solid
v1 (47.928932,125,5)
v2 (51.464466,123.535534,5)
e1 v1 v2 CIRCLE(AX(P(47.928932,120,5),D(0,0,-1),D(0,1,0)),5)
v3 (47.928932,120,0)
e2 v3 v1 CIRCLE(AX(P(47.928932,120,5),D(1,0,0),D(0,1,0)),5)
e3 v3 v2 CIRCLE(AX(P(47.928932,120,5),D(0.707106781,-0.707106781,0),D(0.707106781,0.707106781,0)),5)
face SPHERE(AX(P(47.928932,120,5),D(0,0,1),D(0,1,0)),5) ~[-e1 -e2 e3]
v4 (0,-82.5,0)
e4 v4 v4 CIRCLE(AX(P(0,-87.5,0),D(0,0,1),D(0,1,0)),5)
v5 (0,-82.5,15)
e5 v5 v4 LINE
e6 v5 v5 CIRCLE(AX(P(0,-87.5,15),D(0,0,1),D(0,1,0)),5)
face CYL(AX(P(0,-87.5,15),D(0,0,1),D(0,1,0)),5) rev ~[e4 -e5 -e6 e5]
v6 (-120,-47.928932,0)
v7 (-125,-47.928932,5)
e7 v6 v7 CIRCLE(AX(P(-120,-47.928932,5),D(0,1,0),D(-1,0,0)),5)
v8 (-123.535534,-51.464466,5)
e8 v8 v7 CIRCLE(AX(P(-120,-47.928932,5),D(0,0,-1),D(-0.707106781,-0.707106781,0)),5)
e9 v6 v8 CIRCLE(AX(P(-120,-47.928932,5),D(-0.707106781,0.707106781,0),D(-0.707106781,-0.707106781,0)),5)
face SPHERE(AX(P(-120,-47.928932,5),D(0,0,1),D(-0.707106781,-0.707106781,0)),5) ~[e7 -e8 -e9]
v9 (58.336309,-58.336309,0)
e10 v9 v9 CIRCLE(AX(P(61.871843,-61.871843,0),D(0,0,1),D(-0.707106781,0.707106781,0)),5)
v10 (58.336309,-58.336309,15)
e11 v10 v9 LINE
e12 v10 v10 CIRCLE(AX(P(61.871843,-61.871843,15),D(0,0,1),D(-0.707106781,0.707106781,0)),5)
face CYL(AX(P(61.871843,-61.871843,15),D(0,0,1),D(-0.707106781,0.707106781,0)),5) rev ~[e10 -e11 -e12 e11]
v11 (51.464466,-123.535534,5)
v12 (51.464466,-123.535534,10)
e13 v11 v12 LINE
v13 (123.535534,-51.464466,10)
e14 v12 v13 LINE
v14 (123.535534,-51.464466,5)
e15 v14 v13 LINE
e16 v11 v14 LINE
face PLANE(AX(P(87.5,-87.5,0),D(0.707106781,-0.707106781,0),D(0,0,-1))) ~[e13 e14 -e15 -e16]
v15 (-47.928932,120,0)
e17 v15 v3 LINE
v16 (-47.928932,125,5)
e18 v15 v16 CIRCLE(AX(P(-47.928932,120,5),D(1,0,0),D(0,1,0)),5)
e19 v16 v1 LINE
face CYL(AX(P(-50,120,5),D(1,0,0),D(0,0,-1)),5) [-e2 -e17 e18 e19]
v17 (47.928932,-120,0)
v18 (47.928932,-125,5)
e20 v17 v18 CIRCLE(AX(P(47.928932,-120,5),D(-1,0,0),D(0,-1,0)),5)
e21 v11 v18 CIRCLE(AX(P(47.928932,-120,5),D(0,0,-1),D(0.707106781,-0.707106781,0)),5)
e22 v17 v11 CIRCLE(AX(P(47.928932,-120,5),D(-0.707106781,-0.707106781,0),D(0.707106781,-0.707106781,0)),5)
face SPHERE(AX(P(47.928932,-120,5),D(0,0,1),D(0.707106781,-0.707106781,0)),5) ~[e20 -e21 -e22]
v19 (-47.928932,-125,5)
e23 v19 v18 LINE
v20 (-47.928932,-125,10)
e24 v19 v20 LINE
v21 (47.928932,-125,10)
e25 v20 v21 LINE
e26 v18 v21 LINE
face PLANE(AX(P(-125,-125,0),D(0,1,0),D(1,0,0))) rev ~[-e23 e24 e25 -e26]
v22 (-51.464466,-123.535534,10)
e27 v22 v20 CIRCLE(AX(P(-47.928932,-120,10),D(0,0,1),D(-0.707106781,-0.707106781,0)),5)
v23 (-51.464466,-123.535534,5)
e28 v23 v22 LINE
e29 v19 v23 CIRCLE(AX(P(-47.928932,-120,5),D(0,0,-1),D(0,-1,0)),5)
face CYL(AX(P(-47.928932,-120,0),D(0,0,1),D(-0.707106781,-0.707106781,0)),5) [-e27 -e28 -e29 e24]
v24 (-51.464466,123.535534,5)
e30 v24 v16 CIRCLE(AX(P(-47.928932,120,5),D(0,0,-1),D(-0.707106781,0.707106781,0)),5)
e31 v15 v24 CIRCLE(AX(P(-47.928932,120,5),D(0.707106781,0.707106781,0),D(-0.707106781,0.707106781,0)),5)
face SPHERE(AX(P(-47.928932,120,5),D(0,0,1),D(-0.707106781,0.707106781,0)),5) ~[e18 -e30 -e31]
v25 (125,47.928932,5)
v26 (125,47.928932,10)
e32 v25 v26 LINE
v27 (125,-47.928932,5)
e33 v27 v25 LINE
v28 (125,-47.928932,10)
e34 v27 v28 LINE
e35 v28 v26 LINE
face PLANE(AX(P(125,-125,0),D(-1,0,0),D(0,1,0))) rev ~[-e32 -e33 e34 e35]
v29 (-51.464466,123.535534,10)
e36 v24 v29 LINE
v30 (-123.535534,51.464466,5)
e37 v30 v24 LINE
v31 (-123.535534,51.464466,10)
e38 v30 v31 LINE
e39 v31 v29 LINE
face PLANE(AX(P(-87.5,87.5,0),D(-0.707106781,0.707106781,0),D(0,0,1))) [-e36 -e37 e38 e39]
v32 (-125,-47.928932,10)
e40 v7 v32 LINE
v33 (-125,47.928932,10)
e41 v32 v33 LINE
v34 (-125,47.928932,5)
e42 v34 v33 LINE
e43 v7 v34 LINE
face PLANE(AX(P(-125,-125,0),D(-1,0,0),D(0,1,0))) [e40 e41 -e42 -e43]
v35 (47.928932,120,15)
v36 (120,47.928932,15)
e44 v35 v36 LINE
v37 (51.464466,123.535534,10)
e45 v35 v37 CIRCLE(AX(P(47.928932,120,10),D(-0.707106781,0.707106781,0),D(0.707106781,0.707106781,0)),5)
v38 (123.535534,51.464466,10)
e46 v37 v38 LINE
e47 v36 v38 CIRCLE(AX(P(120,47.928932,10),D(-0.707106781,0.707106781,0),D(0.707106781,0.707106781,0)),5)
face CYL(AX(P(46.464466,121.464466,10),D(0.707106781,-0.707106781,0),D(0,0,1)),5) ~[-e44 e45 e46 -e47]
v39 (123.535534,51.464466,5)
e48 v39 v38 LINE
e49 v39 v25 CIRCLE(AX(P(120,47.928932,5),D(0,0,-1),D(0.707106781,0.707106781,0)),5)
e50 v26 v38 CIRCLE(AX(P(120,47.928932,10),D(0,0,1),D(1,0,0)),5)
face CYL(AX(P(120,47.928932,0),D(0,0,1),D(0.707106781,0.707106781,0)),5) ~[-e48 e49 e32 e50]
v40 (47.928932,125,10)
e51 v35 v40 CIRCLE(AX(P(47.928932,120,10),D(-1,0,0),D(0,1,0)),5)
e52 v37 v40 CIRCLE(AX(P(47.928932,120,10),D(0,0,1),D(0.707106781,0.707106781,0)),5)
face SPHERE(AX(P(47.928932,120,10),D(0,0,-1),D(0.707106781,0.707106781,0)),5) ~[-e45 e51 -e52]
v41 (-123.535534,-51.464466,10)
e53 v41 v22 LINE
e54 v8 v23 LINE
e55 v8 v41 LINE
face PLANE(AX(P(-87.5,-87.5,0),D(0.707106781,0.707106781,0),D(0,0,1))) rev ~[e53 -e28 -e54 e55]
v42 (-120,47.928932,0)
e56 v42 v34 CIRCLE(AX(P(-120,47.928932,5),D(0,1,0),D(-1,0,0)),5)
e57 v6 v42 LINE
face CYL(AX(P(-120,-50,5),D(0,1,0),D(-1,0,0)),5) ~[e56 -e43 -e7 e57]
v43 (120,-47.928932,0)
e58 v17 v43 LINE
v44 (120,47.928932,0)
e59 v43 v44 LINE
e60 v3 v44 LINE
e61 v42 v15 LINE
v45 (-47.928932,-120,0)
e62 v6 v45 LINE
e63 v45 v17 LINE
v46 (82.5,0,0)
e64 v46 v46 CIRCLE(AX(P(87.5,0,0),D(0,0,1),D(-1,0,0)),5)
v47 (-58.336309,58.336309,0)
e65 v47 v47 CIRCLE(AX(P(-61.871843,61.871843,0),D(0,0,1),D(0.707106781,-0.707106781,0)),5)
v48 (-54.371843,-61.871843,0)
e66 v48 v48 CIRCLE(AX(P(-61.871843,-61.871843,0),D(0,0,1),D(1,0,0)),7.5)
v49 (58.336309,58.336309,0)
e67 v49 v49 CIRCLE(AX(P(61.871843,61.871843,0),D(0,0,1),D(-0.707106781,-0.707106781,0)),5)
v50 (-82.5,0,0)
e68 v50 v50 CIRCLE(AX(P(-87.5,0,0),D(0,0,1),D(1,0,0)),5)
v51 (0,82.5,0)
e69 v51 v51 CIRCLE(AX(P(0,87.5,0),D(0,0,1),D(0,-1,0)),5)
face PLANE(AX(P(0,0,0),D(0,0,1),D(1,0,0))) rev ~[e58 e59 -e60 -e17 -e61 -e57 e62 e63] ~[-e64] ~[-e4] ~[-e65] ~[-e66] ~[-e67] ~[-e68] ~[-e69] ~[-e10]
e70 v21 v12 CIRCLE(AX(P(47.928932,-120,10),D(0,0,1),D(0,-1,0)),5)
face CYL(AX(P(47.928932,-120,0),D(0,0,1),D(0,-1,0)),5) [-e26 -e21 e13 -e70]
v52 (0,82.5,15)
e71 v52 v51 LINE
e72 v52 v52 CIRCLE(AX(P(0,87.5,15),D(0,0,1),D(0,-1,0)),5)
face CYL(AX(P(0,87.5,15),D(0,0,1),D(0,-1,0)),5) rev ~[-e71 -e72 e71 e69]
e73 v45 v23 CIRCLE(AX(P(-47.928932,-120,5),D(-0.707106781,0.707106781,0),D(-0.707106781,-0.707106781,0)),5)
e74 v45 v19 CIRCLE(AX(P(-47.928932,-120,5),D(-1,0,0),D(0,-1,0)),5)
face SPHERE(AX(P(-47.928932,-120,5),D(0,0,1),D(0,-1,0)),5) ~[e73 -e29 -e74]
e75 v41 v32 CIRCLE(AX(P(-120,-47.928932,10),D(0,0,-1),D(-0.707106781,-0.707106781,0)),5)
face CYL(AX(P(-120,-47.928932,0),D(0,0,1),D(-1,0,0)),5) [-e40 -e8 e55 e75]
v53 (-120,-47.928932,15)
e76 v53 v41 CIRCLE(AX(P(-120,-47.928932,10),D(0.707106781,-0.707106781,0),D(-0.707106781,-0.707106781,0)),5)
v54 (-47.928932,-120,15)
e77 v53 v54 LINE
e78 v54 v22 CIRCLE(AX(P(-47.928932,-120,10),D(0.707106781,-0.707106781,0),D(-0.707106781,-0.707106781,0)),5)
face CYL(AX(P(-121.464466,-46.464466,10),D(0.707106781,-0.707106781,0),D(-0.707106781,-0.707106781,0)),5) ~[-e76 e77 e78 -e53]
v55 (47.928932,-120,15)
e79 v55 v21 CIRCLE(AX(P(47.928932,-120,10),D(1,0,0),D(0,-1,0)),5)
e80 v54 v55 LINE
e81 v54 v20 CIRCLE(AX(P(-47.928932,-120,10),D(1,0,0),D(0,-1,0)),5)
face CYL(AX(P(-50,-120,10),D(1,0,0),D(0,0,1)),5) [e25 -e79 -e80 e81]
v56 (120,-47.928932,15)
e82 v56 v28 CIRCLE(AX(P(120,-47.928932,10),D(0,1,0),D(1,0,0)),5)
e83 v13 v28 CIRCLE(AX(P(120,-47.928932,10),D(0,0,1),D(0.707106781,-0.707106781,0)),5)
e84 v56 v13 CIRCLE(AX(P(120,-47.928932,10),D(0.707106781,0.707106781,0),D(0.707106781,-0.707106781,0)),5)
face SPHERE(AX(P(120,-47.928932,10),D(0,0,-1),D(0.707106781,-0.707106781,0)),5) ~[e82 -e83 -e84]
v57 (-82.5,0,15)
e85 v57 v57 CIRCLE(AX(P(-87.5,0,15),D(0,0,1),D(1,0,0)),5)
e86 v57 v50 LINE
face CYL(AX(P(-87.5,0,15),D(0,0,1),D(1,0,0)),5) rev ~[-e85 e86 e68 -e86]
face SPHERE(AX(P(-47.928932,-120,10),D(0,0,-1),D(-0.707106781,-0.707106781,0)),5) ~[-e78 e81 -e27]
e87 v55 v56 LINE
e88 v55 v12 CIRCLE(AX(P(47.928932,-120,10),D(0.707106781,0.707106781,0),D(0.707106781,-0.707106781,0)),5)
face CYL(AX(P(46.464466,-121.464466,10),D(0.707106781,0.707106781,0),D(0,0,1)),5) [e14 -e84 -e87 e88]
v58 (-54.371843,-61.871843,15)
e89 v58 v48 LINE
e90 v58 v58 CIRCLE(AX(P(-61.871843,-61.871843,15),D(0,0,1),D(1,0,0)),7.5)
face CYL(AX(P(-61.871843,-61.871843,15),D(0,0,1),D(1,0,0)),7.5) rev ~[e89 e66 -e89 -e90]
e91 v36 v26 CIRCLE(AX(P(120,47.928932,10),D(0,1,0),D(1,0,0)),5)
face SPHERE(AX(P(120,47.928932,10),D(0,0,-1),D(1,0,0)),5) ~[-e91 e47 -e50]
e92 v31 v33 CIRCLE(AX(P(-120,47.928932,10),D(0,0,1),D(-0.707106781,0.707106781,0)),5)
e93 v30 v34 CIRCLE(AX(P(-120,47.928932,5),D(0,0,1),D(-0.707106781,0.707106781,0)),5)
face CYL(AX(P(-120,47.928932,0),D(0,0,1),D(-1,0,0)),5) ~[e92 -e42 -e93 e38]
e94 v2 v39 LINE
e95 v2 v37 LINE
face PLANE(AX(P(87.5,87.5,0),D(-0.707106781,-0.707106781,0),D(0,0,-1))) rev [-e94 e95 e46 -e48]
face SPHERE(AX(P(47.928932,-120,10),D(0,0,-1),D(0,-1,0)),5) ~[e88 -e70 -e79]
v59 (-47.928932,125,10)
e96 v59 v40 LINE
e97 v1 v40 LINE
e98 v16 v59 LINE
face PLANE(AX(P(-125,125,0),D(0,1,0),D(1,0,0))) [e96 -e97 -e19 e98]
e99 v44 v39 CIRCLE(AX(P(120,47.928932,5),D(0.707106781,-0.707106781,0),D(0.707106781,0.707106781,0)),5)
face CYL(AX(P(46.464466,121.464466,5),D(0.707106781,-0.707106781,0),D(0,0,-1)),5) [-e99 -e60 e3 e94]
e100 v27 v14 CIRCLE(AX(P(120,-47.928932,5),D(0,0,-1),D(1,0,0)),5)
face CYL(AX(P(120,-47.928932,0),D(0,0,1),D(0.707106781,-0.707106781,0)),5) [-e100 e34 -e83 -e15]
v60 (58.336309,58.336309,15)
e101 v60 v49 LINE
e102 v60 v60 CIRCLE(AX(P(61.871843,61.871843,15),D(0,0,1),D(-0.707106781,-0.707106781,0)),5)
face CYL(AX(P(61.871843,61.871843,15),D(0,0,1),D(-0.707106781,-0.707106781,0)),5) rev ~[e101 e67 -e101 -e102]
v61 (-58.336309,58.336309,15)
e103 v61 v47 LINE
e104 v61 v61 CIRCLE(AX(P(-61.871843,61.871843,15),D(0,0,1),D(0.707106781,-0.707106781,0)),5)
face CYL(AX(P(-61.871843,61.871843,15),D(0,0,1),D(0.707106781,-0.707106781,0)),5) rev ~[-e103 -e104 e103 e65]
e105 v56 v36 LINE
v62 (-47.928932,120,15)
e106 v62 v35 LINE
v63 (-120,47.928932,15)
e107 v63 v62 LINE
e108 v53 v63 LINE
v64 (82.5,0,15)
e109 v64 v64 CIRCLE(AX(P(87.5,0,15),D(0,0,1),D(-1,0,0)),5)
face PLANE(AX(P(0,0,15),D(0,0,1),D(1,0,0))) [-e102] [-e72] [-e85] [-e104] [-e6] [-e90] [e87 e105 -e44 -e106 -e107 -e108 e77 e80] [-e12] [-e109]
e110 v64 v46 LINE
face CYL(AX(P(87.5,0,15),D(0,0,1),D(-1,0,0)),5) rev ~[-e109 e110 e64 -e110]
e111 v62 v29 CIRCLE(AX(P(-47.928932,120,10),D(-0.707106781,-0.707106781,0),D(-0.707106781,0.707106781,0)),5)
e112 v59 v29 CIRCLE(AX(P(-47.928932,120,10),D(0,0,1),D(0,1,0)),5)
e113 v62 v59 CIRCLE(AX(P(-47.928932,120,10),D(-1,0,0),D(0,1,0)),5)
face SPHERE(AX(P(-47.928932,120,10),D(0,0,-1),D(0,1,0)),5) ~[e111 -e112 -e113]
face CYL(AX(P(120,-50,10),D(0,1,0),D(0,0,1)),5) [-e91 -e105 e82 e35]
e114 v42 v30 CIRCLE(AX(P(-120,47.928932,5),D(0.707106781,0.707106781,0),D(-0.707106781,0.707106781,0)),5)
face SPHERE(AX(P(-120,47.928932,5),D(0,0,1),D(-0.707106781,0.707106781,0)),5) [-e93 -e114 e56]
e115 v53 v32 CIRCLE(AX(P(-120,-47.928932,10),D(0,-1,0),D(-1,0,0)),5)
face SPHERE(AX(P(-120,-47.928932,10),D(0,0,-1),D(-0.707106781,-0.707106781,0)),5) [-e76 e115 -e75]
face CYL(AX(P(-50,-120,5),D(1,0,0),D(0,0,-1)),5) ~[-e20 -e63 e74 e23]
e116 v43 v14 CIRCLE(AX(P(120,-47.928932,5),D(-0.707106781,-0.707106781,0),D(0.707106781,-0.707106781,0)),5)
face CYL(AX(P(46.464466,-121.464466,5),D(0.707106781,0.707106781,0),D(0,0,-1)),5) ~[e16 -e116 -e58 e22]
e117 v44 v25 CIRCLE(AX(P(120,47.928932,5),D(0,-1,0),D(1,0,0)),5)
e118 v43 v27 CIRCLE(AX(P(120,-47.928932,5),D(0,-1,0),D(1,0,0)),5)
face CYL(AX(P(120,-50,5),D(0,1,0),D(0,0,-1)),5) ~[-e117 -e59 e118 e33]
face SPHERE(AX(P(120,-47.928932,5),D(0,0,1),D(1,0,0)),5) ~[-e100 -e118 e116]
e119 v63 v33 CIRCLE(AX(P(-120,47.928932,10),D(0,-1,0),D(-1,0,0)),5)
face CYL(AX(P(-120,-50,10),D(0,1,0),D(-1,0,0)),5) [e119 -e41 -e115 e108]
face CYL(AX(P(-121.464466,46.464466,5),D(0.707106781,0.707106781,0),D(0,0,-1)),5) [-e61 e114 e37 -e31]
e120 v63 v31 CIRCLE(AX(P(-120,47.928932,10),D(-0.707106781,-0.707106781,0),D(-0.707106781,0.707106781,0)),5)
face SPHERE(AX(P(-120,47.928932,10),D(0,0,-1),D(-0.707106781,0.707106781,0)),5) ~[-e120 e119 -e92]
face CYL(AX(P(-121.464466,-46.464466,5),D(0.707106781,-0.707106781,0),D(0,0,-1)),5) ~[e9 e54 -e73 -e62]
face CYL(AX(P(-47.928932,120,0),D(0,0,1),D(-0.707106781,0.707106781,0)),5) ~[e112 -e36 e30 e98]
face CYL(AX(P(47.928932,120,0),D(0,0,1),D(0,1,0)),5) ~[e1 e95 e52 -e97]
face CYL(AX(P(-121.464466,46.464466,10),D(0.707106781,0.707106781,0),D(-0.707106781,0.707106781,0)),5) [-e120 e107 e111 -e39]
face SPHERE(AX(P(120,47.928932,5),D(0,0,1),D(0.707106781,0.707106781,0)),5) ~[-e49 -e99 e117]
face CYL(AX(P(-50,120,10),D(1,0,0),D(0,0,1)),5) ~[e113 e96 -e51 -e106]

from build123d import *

# Parameters (mm, degrees)
F0_W            = 250
F0_H            = 250
F1_DEPTH        = 15
F3_R            = 5
F4_DEPTH        = 15.001
F4_COPIES_COUNT = 7
F4_COPIES_ANGLE = 270
F6_R            = 7.5
F7_DEPTH        = 15.001
F8_SIZE         = 75
F9_R            = 5


# Not quite as in the source:
# - a pattern or mirror of a feature is missing from the dataset's text; its kind, count and spacing are read off the source's solid


with BuildPart() as f1:
    # F0 (on Top) → F1 (new body)
    with BuildSketch(Plane.XY):
        Rectangle(F0_W, F0_H)
    extrude(amount=F1_DEPTH)

    # F3 (on face) → F4 (cut, through all)
    with BuildSketch(Plane.XY.offset(15)):
        with Locations((-87.5, 0)):
            Circle(F3_R)
    f4 = extrude(amount=-F4_DEPTH, mode=Mode.SUBTRACT)

    # F4_copies: F4 ×7 about axis
    f4_copies_axis = Axis((0, 0, 0), (0, 0, -1))
    for i in range(1, F4_COPIES_COUNT):
        add(f4.rotate(f4_copies_axis, i * F4_COPIES_ANGLE / (F4_COPIES_COUNT - 1)), mode=Mode.SUBTRACT)

    # F6 (on face) → F7 (cut, through all)
    with BuildSketch(Plane.XY.offset(15)):
        with Locations((-61.8718433538, -61.8718433538)):
            Circle(F6_R)
    extrude(amount=-F7_DEPTH, mode=Mode.SUBTRACT)

    # F8
    f8_edges = [f1.edges().sort_by_distance(p)[0] for p in [
        (-125, 125, 7.5),
        (-125, -125, 7.5),
        (125, -125, 7.5),
        (125, 125, 7.5),
    ]]
    chamfer(f8_edges, length=F8_SIZE)

    # F9
    f9_edges = [f1.edges().sort_by_distance(p)[0] for p in [
        (-125, 0, 15),
        (-125, 0, 0),
        (-125, 50, 7.5),
        (-125, -50, 7.5),
        (-87.5, -87.5, 0),
        (-50, -125, 7.5),
        (-87.5, -87.5, 15),
        (0, -125, 0),
        (50, -125, 7.5),
        (0, -125, 15),
        (87.5, -87.5, 0),
        (125, -50, 7.5),
        (87.5, -87.5, 15),
        (125, 0, 0),
        (125, 50, 7.5),
        (125, 0, 15),
        (87.5, 87.5, 0),
        (50, 125, 7.5),
        (87.5, 87.5, 15),
        (0, 125, 0),
        (-50, 125, 7.5),
        (0, 125, 15),
        (-87.5, 87.5, 0),
        (-87.5, 87.5, 15),
    ]]
    fillet(f9_edges, radius=F9_R)


solid = f1.part
